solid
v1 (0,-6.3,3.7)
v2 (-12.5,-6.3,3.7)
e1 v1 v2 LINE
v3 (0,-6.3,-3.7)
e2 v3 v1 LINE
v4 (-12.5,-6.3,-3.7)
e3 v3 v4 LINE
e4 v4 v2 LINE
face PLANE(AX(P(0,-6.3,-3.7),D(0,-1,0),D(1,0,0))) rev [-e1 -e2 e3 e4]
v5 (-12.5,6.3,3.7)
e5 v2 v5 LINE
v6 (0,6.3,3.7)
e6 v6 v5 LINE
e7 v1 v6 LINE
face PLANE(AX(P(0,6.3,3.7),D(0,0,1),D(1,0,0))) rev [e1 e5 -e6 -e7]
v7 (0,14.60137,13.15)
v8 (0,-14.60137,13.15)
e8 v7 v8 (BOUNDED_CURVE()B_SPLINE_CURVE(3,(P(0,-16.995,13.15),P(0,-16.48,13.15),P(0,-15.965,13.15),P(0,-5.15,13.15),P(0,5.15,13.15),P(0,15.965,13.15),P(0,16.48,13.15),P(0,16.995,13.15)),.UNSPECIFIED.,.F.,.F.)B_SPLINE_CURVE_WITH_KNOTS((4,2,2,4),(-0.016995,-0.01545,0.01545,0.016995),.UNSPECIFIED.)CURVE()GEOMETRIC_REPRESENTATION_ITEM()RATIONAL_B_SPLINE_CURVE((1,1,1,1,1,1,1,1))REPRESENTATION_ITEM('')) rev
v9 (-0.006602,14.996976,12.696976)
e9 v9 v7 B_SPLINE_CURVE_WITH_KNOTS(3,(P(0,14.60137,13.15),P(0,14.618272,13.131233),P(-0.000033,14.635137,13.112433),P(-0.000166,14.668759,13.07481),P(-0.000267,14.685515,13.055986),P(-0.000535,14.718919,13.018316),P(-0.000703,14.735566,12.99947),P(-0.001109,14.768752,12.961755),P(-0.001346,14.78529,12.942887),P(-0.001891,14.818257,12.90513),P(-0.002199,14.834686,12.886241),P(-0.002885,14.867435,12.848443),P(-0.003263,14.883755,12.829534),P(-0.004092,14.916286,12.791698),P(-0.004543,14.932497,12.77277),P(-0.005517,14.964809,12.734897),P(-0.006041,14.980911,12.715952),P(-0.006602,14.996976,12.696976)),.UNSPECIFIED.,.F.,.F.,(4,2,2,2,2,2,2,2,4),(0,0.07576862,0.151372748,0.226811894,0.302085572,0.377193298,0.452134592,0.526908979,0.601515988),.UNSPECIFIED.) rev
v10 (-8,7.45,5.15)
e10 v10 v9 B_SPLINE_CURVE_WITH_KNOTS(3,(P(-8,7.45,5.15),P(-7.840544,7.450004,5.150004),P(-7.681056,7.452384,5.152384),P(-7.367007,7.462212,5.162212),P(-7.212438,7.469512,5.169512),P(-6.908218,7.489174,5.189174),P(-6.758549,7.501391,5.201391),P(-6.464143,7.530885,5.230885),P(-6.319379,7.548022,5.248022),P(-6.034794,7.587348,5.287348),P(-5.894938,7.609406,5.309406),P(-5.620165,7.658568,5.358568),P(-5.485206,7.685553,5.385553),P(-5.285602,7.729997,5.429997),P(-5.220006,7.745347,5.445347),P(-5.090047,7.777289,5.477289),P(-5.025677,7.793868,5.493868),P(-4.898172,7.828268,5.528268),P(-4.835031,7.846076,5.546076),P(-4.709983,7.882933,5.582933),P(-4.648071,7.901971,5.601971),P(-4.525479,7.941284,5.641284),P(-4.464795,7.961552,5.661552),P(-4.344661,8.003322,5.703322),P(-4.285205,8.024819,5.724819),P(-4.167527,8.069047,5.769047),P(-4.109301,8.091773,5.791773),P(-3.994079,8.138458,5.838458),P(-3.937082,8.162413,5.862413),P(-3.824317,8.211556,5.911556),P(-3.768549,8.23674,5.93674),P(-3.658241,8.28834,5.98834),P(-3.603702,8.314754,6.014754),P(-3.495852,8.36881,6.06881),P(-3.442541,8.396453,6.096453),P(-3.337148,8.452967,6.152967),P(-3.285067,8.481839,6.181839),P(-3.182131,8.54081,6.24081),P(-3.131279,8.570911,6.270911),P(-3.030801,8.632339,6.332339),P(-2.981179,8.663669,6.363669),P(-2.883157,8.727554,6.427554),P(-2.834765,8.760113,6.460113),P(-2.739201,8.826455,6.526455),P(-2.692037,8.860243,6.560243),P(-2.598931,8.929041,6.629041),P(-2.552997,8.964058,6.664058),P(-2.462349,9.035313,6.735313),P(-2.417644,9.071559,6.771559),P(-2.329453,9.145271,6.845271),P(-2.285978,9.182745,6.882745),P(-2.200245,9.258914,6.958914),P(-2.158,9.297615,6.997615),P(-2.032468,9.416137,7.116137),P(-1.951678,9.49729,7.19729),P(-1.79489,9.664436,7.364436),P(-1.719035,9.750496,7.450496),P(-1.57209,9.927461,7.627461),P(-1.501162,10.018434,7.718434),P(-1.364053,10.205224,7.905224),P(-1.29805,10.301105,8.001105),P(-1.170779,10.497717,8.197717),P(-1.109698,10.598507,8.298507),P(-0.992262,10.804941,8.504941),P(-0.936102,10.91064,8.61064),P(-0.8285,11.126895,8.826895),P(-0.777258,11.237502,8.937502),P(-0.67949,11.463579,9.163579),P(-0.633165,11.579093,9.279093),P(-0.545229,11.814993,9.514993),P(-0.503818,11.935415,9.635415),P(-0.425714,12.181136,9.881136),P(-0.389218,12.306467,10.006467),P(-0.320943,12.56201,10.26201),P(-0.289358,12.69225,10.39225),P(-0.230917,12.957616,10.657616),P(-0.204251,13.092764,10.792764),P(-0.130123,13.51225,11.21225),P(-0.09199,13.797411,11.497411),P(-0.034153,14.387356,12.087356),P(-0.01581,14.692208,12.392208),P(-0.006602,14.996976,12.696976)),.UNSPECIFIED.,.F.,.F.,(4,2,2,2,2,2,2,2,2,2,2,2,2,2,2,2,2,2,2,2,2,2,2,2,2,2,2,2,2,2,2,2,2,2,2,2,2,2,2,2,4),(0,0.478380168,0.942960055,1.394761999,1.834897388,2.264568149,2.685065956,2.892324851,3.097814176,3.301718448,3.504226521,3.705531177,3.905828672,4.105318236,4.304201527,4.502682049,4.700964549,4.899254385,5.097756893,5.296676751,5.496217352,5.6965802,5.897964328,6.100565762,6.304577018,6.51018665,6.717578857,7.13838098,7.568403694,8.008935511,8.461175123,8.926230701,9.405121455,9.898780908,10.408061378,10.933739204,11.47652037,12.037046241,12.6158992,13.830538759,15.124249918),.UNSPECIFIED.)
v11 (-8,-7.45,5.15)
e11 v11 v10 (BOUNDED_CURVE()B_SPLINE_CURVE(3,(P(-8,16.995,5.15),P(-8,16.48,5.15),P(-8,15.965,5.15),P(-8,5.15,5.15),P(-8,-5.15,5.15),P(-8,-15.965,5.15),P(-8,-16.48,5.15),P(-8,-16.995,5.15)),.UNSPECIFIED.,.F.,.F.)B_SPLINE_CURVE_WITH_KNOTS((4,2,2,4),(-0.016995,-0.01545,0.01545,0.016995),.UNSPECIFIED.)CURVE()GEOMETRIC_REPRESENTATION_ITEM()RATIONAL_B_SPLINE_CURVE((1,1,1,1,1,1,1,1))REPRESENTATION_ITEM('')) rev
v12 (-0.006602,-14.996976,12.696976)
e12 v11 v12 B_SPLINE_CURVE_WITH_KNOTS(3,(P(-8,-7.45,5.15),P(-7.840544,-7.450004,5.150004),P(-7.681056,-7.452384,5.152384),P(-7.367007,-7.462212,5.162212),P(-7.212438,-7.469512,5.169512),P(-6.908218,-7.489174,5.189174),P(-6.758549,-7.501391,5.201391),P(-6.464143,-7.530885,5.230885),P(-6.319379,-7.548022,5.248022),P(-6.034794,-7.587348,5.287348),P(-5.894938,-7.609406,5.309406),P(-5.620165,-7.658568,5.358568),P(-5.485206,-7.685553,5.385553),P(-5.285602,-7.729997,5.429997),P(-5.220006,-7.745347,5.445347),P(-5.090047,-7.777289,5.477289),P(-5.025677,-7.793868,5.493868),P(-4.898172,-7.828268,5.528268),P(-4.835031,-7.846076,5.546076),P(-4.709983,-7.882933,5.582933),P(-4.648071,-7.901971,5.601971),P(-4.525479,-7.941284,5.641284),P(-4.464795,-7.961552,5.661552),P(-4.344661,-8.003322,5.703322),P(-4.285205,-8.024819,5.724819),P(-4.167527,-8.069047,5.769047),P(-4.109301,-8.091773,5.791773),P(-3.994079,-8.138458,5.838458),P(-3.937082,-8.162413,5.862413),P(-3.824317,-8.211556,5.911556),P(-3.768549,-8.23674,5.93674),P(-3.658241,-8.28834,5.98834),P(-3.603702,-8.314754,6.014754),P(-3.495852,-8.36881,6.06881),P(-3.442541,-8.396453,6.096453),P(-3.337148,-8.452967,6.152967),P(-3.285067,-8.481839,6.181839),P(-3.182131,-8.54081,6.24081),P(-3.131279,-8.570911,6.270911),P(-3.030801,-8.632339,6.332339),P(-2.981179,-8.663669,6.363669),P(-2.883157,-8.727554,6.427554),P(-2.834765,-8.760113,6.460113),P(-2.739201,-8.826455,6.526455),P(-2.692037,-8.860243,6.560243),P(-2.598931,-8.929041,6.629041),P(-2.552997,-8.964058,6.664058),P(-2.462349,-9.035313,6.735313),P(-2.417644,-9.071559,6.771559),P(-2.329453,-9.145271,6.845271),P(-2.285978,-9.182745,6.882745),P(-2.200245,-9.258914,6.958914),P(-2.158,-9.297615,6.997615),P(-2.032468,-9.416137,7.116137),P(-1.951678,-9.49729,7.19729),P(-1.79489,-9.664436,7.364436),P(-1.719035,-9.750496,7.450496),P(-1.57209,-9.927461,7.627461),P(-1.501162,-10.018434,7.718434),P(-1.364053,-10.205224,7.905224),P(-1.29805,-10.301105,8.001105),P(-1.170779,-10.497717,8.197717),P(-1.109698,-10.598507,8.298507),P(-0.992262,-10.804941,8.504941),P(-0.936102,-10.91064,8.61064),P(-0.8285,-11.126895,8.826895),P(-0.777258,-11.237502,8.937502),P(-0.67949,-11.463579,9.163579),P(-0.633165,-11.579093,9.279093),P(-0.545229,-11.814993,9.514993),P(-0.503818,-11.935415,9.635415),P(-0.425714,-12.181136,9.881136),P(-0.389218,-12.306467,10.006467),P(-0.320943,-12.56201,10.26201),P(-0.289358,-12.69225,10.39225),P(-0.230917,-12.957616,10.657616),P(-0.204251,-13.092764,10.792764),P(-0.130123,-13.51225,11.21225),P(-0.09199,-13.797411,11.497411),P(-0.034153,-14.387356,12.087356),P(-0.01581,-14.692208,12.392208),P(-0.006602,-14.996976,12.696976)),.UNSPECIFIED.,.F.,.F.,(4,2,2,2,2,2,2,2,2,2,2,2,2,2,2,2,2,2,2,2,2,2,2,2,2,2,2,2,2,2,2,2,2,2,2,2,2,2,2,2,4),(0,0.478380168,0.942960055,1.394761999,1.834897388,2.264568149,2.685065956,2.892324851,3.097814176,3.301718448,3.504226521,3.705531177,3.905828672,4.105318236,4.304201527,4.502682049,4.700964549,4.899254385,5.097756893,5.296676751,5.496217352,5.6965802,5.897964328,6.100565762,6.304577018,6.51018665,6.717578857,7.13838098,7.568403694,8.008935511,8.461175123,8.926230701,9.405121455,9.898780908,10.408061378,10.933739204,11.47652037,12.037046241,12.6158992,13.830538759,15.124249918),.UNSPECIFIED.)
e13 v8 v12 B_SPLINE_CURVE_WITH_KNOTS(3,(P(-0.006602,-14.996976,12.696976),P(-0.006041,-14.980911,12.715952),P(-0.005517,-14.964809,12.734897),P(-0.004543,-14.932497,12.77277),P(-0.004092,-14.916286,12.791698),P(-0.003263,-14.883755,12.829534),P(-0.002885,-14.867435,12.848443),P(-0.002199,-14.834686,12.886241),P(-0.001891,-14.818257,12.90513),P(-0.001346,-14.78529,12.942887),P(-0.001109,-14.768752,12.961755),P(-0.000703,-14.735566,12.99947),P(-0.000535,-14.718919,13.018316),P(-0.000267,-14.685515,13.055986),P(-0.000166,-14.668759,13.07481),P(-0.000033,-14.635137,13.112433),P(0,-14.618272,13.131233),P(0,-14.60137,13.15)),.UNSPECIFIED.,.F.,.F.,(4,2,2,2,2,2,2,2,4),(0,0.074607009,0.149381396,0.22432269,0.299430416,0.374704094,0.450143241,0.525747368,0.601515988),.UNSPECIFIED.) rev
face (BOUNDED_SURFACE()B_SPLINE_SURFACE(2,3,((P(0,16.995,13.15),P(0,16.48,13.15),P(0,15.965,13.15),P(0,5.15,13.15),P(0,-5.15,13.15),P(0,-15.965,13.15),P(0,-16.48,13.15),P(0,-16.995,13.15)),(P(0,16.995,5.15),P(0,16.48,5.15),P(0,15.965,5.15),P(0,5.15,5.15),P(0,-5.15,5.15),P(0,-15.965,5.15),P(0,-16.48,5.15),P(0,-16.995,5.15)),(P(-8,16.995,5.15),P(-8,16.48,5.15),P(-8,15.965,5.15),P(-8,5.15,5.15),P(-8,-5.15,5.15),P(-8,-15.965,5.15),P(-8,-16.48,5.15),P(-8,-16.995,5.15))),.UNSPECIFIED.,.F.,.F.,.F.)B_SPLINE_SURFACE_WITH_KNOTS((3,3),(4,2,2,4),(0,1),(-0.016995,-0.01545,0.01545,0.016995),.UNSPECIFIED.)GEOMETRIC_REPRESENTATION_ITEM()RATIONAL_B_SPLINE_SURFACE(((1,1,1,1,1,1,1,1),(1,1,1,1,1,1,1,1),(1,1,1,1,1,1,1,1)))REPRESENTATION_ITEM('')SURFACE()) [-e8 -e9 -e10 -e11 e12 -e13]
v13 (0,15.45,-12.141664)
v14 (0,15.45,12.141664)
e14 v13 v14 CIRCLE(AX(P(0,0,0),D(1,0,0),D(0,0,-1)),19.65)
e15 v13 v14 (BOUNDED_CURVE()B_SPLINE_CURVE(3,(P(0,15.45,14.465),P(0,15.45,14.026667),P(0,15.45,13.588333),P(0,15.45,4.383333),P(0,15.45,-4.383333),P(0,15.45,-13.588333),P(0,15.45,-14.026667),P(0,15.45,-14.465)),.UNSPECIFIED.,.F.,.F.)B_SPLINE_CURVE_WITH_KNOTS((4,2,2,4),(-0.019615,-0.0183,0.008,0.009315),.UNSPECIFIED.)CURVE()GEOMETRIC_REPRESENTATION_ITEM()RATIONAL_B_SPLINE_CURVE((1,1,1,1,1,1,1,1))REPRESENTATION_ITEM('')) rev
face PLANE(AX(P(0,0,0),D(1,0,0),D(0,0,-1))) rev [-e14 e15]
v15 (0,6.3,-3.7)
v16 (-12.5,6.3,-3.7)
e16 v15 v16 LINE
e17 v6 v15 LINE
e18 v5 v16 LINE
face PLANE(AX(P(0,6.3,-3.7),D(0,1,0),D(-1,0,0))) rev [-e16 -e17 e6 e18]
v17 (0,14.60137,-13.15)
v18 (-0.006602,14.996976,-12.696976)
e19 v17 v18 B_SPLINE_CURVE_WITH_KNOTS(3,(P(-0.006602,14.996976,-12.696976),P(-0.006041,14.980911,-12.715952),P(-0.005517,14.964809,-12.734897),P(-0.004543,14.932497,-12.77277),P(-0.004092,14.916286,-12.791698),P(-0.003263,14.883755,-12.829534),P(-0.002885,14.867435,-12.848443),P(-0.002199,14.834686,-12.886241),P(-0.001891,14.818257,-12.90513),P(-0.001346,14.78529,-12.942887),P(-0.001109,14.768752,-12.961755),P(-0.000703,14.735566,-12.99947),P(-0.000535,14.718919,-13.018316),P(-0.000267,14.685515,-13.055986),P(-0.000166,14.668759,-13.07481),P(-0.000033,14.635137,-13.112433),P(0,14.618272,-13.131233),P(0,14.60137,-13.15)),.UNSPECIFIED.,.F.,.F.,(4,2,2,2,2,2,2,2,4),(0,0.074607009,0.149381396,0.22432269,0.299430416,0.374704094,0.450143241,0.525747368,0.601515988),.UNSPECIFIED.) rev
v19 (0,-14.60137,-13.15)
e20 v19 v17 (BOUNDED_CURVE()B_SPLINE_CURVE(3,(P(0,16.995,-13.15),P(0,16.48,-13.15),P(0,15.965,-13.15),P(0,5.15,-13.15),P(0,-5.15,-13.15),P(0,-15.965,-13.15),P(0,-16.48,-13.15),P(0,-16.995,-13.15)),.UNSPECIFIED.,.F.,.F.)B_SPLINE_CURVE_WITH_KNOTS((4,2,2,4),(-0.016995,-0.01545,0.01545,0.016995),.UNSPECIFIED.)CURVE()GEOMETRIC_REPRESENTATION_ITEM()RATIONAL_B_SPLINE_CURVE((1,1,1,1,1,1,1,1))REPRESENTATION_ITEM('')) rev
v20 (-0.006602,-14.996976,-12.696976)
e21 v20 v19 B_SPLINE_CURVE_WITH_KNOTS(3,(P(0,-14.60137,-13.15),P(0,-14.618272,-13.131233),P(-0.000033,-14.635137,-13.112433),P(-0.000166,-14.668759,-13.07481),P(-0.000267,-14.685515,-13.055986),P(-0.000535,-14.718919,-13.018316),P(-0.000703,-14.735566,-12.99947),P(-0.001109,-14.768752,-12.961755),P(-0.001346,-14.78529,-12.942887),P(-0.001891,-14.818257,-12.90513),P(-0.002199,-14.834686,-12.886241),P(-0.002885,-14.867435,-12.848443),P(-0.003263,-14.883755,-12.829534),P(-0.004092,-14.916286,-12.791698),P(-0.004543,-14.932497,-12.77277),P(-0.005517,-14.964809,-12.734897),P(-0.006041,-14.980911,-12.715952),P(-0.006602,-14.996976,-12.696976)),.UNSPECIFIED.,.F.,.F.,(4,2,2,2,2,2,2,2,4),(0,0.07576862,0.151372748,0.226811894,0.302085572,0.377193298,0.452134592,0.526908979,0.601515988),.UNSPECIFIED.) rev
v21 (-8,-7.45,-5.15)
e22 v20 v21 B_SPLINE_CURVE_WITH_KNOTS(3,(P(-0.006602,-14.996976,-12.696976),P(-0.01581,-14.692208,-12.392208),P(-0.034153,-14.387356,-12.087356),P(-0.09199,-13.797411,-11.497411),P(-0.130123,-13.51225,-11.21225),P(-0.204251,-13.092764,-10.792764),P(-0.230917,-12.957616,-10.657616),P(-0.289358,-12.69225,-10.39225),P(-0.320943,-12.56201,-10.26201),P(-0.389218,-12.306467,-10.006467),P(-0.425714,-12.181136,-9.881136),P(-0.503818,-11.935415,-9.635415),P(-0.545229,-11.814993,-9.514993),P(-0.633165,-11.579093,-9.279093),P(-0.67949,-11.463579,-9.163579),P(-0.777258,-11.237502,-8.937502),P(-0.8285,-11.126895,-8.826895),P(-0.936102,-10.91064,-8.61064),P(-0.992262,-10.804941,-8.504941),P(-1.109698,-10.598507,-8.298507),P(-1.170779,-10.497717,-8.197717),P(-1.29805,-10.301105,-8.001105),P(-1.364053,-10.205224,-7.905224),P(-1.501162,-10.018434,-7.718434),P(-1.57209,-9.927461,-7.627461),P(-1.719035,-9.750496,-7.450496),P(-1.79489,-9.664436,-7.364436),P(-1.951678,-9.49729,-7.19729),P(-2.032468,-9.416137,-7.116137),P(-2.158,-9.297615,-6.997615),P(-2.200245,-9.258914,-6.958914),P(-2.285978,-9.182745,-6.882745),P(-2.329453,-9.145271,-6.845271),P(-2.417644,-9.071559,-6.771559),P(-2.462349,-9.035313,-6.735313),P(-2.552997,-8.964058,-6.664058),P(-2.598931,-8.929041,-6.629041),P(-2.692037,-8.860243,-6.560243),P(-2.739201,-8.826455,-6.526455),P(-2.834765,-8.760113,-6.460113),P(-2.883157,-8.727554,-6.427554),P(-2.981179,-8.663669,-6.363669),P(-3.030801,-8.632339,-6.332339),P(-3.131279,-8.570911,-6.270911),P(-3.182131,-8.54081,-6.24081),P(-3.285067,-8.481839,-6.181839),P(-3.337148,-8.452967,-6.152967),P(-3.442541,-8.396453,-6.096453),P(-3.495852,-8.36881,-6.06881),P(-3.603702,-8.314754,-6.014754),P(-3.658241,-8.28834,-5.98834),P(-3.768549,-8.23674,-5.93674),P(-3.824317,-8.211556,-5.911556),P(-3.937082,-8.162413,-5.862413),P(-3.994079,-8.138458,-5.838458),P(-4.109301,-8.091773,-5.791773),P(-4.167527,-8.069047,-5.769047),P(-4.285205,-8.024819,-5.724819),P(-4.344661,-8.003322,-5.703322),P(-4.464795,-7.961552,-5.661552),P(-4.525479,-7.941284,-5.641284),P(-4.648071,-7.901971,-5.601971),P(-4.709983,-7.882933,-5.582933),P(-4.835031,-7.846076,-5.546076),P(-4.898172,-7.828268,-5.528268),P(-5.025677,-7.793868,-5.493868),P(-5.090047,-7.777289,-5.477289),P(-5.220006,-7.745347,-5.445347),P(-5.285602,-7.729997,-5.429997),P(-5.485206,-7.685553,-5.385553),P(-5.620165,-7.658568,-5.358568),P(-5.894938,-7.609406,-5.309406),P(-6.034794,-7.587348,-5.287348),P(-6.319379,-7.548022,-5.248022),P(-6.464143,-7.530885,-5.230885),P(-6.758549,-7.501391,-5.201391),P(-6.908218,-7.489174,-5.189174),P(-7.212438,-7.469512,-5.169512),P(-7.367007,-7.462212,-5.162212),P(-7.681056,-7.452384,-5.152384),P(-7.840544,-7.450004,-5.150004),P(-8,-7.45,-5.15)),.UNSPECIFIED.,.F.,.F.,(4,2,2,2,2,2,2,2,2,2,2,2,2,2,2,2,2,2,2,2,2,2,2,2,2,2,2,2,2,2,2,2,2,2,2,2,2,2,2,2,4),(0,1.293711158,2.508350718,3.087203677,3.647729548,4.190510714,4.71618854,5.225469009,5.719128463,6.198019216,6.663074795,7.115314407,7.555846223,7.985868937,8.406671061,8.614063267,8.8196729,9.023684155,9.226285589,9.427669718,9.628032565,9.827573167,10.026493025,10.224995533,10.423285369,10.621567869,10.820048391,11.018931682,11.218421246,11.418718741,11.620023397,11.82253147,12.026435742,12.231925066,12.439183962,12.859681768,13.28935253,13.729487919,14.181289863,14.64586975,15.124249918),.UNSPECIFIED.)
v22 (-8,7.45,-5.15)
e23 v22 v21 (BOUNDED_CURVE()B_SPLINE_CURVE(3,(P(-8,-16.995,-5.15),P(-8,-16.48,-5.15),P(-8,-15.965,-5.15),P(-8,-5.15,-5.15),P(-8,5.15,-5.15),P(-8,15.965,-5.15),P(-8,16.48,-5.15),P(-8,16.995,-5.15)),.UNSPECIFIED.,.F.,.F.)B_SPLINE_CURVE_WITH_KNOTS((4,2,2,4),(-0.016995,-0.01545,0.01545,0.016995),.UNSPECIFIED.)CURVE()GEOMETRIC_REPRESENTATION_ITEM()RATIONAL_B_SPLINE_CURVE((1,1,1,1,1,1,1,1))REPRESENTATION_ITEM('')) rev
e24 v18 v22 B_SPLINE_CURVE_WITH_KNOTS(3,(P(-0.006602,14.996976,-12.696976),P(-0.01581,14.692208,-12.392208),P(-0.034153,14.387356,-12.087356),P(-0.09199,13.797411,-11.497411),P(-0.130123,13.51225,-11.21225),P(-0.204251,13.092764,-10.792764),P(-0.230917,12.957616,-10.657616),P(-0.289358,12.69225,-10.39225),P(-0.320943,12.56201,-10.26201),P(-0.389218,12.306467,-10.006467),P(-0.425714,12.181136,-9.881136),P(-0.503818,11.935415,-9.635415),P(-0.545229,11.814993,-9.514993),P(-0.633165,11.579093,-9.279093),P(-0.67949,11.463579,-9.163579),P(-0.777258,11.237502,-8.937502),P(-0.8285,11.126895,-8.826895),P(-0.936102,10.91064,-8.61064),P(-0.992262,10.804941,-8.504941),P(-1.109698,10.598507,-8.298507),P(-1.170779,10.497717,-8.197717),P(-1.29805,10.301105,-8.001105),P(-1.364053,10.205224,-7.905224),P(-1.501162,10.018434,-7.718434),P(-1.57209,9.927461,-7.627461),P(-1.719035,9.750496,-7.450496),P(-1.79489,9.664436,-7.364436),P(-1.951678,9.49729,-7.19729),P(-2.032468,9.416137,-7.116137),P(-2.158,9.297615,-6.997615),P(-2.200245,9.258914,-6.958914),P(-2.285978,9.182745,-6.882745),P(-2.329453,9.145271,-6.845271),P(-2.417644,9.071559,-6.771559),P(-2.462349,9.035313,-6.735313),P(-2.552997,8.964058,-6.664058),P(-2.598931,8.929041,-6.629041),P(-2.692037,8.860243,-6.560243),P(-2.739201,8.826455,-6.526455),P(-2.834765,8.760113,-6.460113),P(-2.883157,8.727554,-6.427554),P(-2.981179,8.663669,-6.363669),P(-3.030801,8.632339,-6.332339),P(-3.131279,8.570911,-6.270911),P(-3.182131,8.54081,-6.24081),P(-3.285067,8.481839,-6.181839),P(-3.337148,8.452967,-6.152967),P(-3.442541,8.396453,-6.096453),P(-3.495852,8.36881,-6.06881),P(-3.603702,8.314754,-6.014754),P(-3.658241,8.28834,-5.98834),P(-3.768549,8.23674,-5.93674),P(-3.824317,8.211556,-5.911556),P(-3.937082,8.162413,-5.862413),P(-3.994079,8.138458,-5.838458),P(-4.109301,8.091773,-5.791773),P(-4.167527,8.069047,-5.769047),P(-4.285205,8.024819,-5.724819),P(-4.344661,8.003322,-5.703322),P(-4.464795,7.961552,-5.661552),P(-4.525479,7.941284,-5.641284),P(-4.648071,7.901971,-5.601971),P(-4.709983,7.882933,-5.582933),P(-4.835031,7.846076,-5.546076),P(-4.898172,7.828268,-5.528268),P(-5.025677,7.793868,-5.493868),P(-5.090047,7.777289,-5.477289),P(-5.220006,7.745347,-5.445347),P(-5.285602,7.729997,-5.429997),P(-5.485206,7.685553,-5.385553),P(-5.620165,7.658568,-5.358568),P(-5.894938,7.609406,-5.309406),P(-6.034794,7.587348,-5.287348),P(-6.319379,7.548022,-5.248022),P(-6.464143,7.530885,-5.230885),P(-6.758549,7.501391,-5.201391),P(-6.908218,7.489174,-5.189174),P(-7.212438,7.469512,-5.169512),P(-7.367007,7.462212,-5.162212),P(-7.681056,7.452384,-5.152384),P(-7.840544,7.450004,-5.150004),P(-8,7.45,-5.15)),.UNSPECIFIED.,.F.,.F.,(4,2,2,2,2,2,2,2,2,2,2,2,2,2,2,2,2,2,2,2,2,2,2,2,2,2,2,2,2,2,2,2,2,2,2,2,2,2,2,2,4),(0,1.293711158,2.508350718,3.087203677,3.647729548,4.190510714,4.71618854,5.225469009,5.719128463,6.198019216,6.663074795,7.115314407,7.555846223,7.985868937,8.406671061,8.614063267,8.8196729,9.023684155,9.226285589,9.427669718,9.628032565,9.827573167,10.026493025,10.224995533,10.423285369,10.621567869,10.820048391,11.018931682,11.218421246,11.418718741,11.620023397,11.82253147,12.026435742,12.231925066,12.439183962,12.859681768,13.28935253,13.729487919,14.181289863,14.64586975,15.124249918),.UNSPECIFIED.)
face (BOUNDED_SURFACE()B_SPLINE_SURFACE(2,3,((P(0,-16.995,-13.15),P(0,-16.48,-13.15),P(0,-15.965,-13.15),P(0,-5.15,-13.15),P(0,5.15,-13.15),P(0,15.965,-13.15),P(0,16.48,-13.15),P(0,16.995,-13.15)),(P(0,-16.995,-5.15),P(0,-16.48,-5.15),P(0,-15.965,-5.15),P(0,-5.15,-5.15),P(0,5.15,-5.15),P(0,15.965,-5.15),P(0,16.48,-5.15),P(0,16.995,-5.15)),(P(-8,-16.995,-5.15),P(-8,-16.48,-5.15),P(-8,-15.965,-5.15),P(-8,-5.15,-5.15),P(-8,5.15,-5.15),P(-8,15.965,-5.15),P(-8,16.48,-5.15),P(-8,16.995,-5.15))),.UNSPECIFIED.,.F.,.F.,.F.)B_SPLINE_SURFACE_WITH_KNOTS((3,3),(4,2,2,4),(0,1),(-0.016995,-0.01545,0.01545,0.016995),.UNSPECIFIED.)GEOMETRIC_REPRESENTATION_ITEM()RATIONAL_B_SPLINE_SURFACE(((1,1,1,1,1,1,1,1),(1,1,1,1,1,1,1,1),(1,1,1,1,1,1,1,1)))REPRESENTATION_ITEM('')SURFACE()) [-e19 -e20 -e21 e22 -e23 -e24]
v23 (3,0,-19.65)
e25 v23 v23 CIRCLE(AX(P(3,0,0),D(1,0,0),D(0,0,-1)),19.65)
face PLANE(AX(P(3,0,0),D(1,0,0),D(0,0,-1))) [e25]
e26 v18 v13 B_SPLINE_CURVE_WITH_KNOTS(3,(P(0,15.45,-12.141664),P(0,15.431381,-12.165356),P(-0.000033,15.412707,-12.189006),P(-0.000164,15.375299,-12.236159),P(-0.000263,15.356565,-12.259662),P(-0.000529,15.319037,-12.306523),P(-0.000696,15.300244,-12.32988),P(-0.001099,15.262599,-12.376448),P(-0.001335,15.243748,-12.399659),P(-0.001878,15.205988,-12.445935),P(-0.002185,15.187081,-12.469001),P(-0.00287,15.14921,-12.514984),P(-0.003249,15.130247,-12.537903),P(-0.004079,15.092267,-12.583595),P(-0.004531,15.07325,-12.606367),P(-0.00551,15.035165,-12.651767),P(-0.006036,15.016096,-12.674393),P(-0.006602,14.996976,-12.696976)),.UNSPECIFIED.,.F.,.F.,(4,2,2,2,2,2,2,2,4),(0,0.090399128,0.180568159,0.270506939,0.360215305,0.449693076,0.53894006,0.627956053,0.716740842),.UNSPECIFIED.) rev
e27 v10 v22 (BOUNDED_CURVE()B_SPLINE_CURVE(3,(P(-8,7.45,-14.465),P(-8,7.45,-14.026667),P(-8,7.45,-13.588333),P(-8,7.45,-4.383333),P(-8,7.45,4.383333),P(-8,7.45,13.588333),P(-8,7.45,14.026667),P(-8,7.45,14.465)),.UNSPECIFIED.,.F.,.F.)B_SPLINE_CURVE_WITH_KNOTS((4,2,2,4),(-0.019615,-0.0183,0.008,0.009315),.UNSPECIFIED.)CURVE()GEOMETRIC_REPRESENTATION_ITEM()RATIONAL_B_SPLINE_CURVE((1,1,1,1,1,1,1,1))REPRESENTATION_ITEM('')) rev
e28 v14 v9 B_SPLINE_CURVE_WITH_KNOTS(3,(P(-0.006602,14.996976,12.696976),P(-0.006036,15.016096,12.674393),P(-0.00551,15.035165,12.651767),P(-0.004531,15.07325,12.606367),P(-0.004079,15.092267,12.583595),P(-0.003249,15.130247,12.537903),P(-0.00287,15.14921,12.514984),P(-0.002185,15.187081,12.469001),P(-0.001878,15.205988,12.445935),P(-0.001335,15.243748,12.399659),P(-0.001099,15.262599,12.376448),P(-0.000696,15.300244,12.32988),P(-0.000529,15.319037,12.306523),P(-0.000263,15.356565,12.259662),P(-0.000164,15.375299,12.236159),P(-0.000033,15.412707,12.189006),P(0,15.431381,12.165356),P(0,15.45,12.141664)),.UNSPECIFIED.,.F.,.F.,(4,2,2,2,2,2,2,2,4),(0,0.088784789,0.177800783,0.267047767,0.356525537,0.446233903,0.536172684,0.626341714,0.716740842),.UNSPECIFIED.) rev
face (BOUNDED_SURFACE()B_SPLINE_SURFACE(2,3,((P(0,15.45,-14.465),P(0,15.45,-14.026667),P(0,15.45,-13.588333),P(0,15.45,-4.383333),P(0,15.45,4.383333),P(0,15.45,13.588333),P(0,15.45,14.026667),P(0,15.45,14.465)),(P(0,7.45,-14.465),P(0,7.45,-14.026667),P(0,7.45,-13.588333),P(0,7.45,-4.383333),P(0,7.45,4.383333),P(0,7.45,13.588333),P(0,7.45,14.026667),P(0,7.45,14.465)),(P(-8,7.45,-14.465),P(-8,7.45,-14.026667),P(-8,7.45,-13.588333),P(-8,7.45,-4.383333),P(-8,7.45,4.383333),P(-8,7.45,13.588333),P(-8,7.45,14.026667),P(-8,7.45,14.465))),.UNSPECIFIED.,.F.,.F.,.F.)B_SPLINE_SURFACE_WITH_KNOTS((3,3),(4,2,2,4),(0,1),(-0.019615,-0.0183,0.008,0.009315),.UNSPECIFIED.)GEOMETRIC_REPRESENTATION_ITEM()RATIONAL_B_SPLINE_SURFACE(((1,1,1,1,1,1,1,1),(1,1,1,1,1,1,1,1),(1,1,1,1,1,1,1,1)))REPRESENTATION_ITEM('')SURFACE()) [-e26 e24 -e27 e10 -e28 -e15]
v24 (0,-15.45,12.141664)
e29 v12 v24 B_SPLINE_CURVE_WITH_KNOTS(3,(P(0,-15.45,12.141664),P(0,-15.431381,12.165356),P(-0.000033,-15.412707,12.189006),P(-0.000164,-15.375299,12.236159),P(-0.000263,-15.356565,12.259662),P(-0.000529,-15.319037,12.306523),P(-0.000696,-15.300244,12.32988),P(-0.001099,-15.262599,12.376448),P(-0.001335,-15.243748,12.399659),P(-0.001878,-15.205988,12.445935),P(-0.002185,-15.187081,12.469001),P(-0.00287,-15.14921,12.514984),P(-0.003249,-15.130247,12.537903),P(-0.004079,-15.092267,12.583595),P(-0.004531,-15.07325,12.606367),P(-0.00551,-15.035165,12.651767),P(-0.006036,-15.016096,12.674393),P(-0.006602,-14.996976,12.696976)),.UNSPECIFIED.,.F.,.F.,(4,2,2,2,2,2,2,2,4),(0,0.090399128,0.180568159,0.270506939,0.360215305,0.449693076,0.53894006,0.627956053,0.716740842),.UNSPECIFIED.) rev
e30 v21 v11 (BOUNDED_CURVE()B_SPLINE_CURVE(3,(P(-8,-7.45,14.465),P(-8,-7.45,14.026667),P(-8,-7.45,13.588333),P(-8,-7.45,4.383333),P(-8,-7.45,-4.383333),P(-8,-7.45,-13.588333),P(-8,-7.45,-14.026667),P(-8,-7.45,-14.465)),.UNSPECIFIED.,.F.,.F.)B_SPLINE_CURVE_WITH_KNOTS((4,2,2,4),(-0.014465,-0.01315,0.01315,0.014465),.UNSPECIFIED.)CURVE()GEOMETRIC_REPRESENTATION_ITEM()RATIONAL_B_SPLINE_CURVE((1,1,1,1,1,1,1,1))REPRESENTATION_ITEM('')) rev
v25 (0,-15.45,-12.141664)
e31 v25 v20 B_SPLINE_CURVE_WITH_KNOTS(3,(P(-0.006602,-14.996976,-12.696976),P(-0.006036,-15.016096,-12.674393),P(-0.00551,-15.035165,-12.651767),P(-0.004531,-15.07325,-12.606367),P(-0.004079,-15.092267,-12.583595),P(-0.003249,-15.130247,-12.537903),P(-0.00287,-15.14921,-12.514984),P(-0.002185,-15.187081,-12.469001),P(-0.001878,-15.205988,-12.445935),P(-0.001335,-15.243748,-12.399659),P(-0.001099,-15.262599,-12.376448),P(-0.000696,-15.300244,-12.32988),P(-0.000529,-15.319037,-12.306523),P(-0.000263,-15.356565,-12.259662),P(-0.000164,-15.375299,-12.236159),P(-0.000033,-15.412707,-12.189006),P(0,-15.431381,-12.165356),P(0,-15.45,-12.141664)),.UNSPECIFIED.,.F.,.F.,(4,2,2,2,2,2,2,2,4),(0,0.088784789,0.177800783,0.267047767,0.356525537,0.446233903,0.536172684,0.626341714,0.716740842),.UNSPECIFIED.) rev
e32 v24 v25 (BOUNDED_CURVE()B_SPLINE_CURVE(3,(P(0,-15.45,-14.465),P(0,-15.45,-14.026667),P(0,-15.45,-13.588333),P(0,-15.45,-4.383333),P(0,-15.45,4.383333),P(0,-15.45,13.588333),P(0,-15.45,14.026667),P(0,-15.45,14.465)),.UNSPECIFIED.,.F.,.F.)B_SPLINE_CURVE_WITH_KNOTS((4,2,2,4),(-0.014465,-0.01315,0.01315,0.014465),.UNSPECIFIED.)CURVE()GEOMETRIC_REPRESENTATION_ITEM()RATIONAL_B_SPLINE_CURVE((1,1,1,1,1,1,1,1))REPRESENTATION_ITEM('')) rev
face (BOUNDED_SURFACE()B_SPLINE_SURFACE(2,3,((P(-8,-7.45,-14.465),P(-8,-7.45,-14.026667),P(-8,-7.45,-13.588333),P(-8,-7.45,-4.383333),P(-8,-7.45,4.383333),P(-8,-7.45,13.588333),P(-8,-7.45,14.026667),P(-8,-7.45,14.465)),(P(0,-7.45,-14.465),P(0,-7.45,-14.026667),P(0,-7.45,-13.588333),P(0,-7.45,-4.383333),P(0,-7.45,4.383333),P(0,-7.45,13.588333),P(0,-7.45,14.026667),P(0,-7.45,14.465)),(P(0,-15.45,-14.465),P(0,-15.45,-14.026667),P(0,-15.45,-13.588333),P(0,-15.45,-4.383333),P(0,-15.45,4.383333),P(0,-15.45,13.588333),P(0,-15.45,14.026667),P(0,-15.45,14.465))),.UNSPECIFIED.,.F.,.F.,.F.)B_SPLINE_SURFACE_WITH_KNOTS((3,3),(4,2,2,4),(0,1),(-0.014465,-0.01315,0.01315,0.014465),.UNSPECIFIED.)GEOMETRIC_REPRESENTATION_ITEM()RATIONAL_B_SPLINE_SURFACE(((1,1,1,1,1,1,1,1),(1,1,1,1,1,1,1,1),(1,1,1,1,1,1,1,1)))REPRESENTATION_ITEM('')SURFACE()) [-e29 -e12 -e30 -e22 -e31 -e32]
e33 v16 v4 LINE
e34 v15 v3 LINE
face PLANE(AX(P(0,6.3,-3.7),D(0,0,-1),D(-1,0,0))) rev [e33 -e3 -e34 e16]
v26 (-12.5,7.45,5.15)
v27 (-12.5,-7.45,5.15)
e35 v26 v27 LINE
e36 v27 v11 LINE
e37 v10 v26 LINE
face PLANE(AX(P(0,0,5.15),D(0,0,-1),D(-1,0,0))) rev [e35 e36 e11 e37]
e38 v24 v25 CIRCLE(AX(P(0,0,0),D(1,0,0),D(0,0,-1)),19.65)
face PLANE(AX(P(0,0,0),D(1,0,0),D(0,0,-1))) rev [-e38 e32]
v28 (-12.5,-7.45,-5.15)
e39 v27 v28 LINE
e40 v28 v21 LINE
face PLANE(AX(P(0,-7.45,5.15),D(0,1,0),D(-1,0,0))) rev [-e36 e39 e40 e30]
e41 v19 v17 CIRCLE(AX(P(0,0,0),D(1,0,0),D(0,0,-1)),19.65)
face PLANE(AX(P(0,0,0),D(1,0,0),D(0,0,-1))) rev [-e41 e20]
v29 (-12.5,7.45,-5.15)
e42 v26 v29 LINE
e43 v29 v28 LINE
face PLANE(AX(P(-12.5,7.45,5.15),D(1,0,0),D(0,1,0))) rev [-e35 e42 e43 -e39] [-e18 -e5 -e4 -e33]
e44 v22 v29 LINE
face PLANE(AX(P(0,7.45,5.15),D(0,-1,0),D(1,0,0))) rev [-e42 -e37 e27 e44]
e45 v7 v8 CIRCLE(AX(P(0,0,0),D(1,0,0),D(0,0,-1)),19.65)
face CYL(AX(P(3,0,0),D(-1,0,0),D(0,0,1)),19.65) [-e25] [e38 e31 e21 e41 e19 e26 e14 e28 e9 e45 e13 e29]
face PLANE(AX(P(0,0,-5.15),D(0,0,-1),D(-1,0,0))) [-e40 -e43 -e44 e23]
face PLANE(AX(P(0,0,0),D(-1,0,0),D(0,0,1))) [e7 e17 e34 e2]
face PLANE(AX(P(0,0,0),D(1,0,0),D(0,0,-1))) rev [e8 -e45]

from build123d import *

# Parameters (mm, degrees)
SKETCH2_R           = 19.65
BOSS_EXTRUDE1_DEPTH = 3
SKETCH3_W           = 12.5
SKETCH3_H           = 14.9
BOSS_EXTRUDE2_DEPTH = 5.15
SKETCH4_W           = 7.4
SKETCH4_H           = 12.6
CUT_EXTRUDE1_DEPTH  = 12.5
FILLET1_SIZE        = 8


with BuildPart() as part:
    # Sketch2 → Boss-Extrude1 (new body)
    with BuildSketch(Plane(origin=(0, 0, 0), x_dir=(0, 0, -1), z_dir=(1, 0, 0))):
        Circle(SKETCH2_R)
    extrude(amount=BOSS_EXTRUDE1_DEPTH)

    # Sketch3 → Boss-Extrude2 (add, symmetric)
    with BuildSketch(Plane.XY):
        with Locations((-6.25, 0)):
            Rectangle(SKETCH3_W, SKETCH3_H)
    extrude(amount=BOSS_EXTRUDE2_DEPTH, both=True)

    # Sketch4 → Cut-Extrude1 (cut)
    with BuildSketch(Plane.ZY.offset(12.5)):
        Rectangle(SKETCH4_W, SKETCH4_H)
    extrude(amount=-CUT_EXTRUDE1_DEPTH, mode=Mode.SUBTRACT)

    # Fillet1
    # a fillet whose section is not a circle: 8 mm, written as the material it adds along each edge
    with BuildSketch(Plane(origin=(0, 7.45, 5.15), x_dir=(0, 1, 0), z_dir=(0, 0, -1))) as fillet1_piece_1:
        with BuildLine():
            Bezier((FILLET1_SIZE, 0), (0, 0), (0, -FILLET1_SIZE), weights=[1, 1, 1])
            Line((0, -FILLET1_SIZE), (0, 0))
            Line((0, 0), (FILLET1_SIZE, 0))
        make_face()
    extrude(amount=10.3)
    with BuildSketch(Plane(origin=(0, -7.45, 5.15), x_dir=(0, 0, 1), z_dir=(0, 1, 0))) as fillet1_piece_2:
        with BuildLine():
            Bezier((FILLET1_SIZE, 0), (0, 0), (0, -FILLET1_SIZE), weights=[1, 1, 1])
            Line((0, -FILLET1_SIZE), (0, 0))
            Line((0, 0), (FILLET1_SIZE, 0))
        make_face()
    extrude(amount=14.9)
    with BuildSketch(Plane(origin=(0, -7.45, 5.15), x_dir=(0, -1, 0), z_dir=(0, 0, -1))) as fillet1_piece_3:
        with BuildLine():
            Bezier((FILLET1_SIZE, 0), (0, 0), (0, FILLET1_SIZE), weights=[1, 1, 1])
            Line((0, FILLET1_SIZE), (0, 0))
            Line((0, 0), (FILLET1_SIZE, 0))
        make_face()
    extrude(amount=10.3)
    with BuildSketch(Plane(origin=(0, -7.45, -5.15), x_dir=(0, 0, -1), z_dir=(0, 1, 0))) as fillet1_piece_4:
        with BuildLine():
            Bezier((FILLET1_SIZE, 0), (0, 0), (0, FILLET1_SIZE), weights=[1, 1, 1])
            Line((0, FILLET1_SIZE), (0, 0))
            Line((0, 0), (FILLET1_SIZE, 0))
        make_face()
    extrude(amount=14.9)
    with BuildSketch(Plane(origin=(0, -7.45, 5.15), x_dir=(0, 0, 1), z_dir=(0, 1, 0))) as fillet1_piece_5a_section:
        with BuildLine():
            Bezier((FILLET1_SIZE, 0), (0, 0), (0, -FILLET1_SIZE), weights=[1, 1, 1])
            Line((0, -FILLET1_SIZE), (0, 0))
            Line((0, 0), (FILLET1_SIZE, 0))
        make_face()
    fillet1_piece_5a = extrude(amount=34.9, mode=Mode.PRIVATE)
    fillet1_piece_5a = fillet1_piece_5a & Plane(origin=(0, 0, 0), x_dir=(0, 0, -1), z_dir=(-1, 0, 0)) * Cylinder(19.65, 102, mode=Mode.PRIVATE)
    fillet1_piece_5a = split(fillet1_piece_5a, bisect_by=Plane(origin=(0, 7.45, 5.15), z_dir=(0, 1, 0)), keep=Keep.TOP, mode=Mode.PRIVATE)
    with BuildSketch(Plane(origin=(0, 7.45, 25.15), x_dir=(0, 1, 0), z_dir=(0, 0, -1))) as fillet1_piece_5b_section:
        with BuildLine():
            Bezier((FILLET1_SIZE, 0), (0, 0), (0, -FILLET1_SIZE), weights=[1, 1, 1])
            Line((0, -FILLET1_SIZE), (0, 0))
            Line((0, 0), (FILLET1_SIZE, 0))
        make_face()
    fillet1_piece_5b = extrude(amount=30.3, mode=Mode.PRIVATE)
    fillet1_piece_5b = fillet1_piece_5b & Plane(origin=(0, 0, 0), x_dir=(0, 0, -1), z_dir=(-1, 0, 0)) * Cylinder(19.65, 93, mode=Mode.PRIVATE)
    fillet1_piece_5b = split(fillet1_piece_5b, bisect_by=Plane(origin=(0, 7.45, 5.15), z_dir=(0, 0, 1)), keep=Keep.TOP, mode=Mode.PRIVATE)
    fillet1_piece_5 = fillet1_piece_5a & fillet1_piece_5b
    add(fillet1_piece_5)
    with BuildSketch(Plane(origin=(0, -7.45, -5.15), x_dir=(0, 0, -1), z_dir=(0, 1, 0))) as fillet1_piece_6a_section:
        with BuildLine():
            Bezier((FILLET1_SIZE, 0), (0, 0), (0, FILLET1_SIZE), weights=[1, 1, 1])
            Line((0, FILLET1_SIZE), (0, 0))
            Line((0, 0), (FILLET1_SIZE, 0))
        make_face()
    fillet1_piece_6a = extrude(amount=34.9, mode=Mode.PRIVATE)
    fillet1_piece_6a = fillet1_piece_6a & Plane(origin=(0, 0, 0), x_dir=(0, 0, -1), z_dir=(-1, 0, 0)) * Cylinder(19.65, 102, mode=Mode.PRIVATE)
    fillet1_piece_6a = split(fillet1_piece_6a, bisect_by=Plane(origin=(0, 7.45, -5.15), z_dir=(0, 1, 0)), keep=Keep.TOP, mode=Mode.PRIVATE)
    with BuildSketch(Plane(origin=(0, 7.45, 5.15), x_dir=(0, 1, 0), z_dir=(0, 0, -1))) as fillet1_piece_6b_section:
        with BuildLine():
            Bezier((FILLET1_SIZE, 0), (0, 0), (0, -FILLET1_SIZE), weights=[1, 1, 1])
            Line((0, -FILLET1_SIZE), (0, 0))
            Line((0, 0), (FILLET1_SIZE, 0))
        make_face()
    fillet1_piece_6b = extrude(amount=30.3, mode=Mode.PRIVATE)
    fillet1_piece_6b = fillet1_piece_6b & Plane(origin=(0, 0, 0), x_dir=(0, 0, -1), z_dir=(-1, 0, 0)) * Cylinder(19.65, 93, mode=Mode.PRIVATE)
    fillet1_piece_6b = split(fillet1_piece_6b, bisect_by=Plane(origin=(0, 7.45, -5.15), z_dir=(0, 0, -1)), keep=Keep.TOP, mode=Mode.PRIVATE)
    fillet1_piece_6 = fillet1_piece_6a & fillet1_piece_6b
    add(fillet1_piece_6)
    with BuildSketch(Plane(origin=(0, -27.45, 5.15), x_dir=(0, 0, 1), z_dir=(0, 1, 0))) as fillet1_piece_7a_section:
        with BuildLine():
            Bezier((FILLET1_SIZE, 0), (0, 0), (0, -FILLET1_SIZE), weights=[1, 1, 1])
            Line((0, -FILLET1_SIZE), (0, 0))
            Line((0, 0), (FILLET1_SIZE, 0))
        make_face()
    fillet1_piece_7a = extrude(amount=34.9, mode=Mode.PRIVATE)
    fillet1_piece_7a = fillet1_piece_7a & Plane(origin=(0, 0, 0), x_dir=(0, 0, -1), z_dir=(-1, 0, 0)) * Cylinder(19.65, 102, mode=Mode.PRIVATE)
    fillet1_piece_7a = split(fillet1_piece_7a, bisect_by=Plane(origin=(0, -7.45, 5.15), z_dir=(0, -1, 0)), keep=Keep.TOP, mode=Mode.PRIVATE)
    with BuildSketch(Plane(origin=(0, -7.45, 25.15), x_dir=(0, -1, 0), z_dir=(0, 0, -1))) as fillet1_piece_7b_section:
        with BuildLine():
            Bezier((FILLET1_SIZE, 0), (0, 0), (0, FILLET1_SIZE), weights=[1, 1, 1])
            Line((0, FILLET1_SIZE), (0, 0))
            Line((0, 0), (FILLET1_SIZE, 0))
        make_face()
    fillet1_piece_7b = extrude(amount=30.3, mode=Mode.PRIVATE)
    fillet1_piece_7b = fillet1_piece_7b & Plane(origin=(0, 0, 0), x_dir=(0, 0, -1), z_dir=(-1, 0, 0)) * Cylinder(19.65, 93, mode=Mode.PRIVATE)
    fillet1_piece_7b = split(fillet1_piece_7b, bisect_by=Plane(origin=(0, -7.45, 5.15), z_dir=(0, 0, 1)), keep=Keep.TOP, mode=Mode.PRIVATE)
    fillet1_piece_7 = fillet1_piece_7a & fillet1_piece_7b
    add(fillet1_piece_7)
    with BuildSketch(Plane(origin=(0, -7.45, 5.15), x_dir=(0, -1, 0), z_dir=(0, 0, -1))) as fillet1_piece_8a_section:
        with BuildLine():
            Bezier((FILLET1_SIZE, 0), (0, 0), (0, FILLET1_SIZE), weights=[1, 1, 1])
            Line((0, FILLET1_SIZE), (0, 0))
            Line((0, 0), (FILLET1_SIZE, 0))
        make_face()
    fillet1_piece_8a = extrude(amount=30.3, mode=Mode.PRIVATE)
    fillet1_piece_8a = fillet1_piece_8a & Plane(origin=(0, 0, 0), x_dir=(0, 0, -1), z_dir=(-1, 0, 0)) * Cylinder(19.65, 93, mode=Mode.PRIVATE)
    fillet1_piece_8a = split(fillet1_piece_8a, bisect_by=Plane(origin=(0, -7.45, -5.15), z_dir=(0, 0, -1)), keep=Keep.TOP, mode=Mode.PRIVATE)
    with BuildSketch(Plane(origin=(0, -27.45, -5.15), x_dir=(0, 0, -1), z_dir=(0, 1, 0))) as fillet1_piece_8b_section:
        with BuildLine():
            Bezier((FILLET1_SIZE, 0), (0, 0), (0, FILLET1_SIZE), weights=[1, 1, 1])
            Line((0, FILLET1_SIZE), (0, 0))
            Line((0, 0), (FILLET1_SIZE, 0))
        make_face()
    fillet1_piece_8b = extrude(amount=34.9, mode=Mode.PRIVATE)
    fillet1_piece_8b = fillet1_piece_8b & Plane(origin=(0, 0, 0), x_dir=(0, 0, -1), z_dir=(-1, 0, 0)) * Cylinder(19.65, 102, mode=Mode.PRIVATE)
    fillet1_piece_8b = split(fillet1_piece_8b, bisect_by=Plane(origin=(0, -7.45, -5.15), z_dir=(0, -1, 0)), keep=Keep.TOP, mode=Mode.PRIVATE)
    fillet1_piece_8 = fillet1_piece_8a & fillet1_piece_8b
    add(fillet1_piece_8)


solid = part.part
